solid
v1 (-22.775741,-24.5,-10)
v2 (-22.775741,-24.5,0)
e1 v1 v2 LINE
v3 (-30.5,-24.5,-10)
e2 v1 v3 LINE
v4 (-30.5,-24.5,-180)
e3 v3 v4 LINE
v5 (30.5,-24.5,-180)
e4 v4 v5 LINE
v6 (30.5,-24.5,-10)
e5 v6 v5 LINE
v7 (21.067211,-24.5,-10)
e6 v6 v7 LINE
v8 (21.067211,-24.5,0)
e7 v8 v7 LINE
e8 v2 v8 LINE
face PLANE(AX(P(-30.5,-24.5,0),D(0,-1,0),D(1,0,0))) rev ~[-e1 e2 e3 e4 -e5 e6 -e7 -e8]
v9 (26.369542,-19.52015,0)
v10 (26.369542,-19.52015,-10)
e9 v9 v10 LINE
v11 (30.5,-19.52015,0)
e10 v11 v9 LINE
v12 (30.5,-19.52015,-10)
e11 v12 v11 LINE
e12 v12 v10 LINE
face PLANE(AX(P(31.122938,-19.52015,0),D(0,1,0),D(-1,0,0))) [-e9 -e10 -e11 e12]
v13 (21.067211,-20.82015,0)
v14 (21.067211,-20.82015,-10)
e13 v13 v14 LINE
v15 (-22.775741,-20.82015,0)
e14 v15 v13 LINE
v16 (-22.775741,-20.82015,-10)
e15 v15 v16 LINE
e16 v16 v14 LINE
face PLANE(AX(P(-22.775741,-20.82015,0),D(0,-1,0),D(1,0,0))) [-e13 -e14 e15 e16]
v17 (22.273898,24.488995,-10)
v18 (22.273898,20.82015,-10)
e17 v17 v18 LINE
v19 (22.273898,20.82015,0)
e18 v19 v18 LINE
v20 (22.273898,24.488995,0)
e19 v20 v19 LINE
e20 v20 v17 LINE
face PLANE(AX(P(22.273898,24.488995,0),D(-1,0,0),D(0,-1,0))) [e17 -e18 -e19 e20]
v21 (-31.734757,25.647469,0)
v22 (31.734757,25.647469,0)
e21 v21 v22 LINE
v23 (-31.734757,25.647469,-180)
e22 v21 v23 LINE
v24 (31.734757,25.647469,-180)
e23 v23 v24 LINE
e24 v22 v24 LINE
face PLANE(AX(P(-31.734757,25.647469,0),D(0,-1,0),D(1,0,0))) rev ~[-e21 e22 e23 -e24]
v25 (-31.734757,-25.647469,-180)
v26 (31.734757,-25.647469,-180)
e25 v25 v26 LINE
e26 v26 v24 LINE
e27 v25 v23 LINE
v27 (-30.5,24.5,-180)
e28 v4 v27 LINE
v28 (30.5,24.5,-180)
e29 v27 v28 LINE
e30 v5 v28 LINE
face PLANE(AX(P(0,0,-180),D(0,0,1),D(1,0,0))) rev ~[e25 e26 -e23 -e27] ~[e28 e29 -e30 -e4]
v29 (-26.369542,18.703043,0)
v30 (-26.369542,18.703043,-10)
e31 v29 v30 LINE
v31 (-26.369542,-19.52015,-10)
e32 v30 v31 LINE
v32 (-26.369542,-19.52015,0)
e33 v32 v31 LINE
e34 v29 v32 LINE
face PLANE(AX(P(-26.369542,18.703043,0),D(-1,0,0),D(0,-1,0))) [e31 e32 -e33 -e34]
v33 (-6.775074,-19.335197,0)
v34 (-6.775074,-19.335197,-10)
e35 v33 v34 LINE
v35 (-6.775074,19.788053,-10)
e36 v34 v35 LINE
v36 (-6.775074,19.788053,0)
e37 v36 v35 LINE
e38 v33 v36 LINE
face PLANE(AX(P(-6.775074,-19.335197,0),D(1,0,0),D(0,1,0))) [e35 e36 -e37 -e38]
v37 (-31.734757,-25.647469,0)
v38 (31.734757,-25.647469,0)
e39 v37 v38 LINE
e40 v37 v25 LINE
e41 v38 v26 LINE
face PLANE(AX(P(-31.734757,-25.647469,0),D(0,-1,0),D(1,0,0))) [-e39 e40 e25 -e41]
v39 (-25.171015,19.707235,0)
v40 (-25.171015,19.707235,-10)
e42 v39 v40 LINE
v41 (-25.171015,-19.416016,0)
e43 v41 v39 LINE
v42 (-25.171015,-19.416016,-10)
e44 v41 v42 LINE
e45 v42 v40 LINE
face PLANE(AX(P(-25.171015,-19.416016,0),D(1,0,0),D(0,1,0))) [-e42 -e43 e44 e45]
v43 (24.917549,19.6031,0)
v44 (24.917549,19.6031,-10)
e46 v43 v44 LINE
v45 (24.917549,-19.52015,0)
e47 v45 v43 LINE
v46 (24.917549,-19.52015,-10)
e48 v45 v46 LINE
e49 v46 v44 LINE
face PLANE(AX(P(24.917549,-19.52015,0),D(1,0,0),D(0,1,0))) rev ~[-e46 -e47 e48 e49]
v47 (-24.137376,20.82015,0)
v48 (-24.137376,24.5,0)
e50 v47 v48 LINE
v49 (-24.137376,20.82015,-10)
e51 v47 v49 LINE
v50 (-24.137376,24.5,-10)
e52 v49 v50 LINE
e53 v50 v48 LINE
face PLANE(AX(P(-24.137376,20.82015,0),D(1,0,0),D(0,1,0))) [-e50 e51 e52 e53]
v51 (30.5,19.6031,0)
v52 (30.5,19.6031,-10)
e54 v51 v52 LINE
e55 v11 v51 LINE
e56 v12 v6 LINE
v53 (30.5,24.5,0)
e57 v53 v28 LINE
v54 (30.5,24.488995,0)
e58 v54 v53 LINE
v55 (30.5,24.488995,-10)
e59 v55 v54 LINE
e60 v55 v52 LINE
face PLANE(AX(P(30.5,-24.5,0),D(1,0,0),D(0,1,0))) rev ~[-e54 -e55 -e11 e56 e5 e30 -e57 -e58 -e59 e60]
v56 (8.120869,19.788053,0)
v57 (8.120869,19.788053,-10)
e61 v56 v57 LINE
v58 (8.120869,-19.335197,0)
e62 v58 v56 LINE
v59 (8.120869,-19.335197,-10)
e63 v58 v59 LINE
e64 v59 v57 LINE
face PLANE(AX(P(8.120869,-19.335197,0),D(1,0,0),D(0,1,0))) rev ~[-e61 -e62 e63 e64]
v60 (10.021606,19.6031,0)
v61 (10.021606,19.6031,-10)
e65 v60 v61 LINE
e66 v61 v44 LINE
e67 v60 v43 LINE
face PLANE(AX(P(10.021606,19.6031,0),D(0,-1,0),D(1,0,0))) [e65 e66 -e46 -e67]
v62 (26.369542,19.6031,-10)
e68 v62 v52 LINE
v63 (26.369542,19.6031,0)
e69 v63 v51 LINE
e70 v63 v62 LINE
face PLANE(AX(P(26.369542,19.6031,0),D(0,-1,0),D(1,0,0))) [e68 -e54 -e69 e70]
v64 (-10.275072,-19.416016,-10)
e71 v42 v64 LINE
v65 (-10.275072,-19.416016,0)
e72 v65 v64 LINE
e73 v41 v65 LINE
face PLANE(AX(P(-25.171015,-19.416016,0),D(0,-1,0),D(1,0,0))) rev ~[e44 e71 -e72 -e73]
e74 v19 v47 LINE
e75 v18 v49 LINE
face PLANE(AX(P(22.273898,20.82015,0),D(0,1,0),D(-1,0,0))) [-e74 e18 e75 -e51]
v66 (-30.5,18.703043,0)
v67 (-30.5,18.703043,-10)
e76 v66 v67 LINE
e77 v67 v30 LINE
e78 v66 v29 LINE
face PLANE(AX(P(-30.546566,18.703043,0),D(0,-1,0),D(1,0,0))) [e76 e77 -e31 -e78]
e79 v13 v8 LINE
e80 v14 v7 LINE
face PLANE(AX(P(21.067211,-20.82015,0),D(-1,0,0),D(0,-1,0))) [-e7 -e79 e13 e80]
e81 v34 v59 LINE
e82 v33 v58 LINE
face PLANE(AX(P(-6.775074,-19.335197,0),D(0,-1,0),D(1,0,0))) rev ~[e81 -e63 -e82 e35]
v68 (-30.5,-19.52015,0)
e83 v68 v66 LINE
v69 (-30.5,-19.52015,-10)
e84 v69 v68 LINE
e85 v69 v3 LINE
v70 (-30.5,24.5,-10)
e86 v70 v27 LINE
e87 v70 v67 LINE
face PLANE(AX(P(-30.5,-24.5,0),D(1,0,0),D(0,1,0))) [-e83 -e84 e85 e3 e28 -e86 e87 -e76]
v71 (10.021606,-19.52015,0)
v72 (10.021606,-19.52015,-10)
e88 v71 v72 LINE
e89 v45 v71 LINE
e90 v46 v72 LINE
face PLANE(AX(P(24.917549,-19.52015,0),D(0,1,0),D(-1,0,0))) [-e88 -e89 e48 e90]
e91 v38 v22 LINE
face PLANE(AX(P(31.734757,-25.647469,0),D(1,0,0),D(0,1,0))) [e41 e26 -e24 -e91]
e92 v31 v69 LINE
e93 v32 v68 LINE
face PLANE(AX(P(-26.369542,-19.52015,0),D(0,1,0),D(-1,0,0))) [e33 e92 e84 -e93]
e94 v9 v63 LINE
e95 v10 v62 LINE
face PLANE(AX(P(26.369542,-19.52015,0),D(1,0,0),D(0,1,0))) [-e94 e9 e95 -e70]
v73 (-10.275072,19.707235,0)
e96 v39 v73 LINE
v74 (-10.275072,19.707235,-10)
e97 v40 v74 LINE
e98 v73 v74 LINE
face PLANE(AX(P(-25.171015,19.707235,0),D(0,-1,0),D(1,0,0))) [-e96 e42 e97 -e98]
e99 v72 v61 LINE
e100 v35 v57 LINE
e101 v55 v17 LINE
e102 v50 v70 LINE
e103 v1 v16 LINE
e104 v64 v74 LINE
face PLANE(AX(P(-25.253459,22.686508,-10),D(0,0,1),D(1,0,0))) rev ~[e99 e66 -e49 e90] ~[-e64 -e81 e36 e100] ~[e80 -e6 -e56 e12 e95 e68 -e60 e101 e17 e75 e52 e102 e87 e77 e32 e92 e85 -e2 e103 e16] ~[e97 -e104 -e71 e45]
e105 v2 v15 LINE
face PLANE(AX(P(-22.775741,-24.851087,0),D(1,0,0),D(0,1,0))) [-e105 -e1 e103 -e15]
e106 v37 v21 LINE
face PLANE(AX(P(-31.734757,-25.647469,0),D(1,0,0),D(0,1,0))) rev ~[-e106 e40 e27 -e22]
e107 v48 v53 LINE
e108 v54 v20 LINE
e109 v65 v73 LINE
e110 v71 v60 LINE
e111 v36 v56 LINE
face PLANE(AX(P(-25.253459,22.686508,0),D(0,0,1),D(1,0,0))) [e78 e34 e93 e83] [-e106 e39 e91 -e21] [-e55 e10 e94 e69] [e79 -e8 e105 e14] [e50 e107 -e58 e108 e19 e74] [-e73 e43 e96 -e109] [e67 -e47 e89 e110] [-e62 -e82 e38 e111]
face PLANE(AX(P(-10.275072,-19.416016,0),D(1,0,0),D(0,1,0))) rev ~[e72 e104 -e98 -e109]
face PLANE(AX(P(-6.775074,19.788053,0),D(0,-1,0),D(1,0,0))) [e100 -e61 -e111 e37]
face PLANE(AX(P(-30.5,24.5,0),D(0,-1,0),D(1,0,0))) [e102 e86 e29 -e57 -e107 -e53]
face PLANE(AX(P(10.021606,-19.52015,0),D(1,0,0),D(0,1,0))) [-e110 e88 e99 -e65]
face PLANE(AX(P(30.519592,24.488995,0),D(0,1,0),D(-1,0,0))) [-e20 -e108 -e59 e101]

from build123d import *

# Parameters (mm, degrees)
F0_W     = 63.4695142508
F0_H     = 51.2949377298
F0_W_2   = 61
F0_H_2   = 49
F1_DEPTH = 180
F3_W     = 2.2321660072
F3_H     = 3.732714802
F3_W_2   = 14.8959429935
F3_H_2   = 39.1232501715
F3_W_3   = 3.5938005894
F3_H_3   = 1.2999996543
F3_W_4   = 1.4519924298
F4_DEPTH = 10


# Not quite as in the source:
# - a feature names something its author has since deleted; it is built from what else it names
# - the program builds the solid bodies; features that only make, move or delete a surface that nothing else refers to are left out


with BuildPart() as f1:
    # F0 (on Top) → F1 (new body)
    with BuildSketch(Plane.XY):
        Rectangle(F0_W, F0_H)
        Rectangle(F0_W_2, F0_H_2, mode=Mode.SUBTRACT)
    extrude(amount=-F1_DEPTH)

    # F3 (on Top) → F4 (join)
    with BuildSketch(Plane.XY):
        with Locations((-25.2534588799, 22.6865075529)):
            Rectangle(F3_W, F3_H)
        Polygon((-24.1373758763, 20.8201501518), (-26.3695418835, 20.8201501518), (-26.3695418835, 18.7030434608), (-26.3695418835, -19.5201504976), (-22.775741294, -19.5201504976), (-22.775741294, -20.8201501518), (21.0672114044, -20.8201501518), (21.0672114044, -19.5201504976), (10.0216064602, -19.5201504976), (10.0216064602, 19.603099674), (22.2738981247, 19.603099674), (22.2738981247, 20.8201501518), align=None)
        with Locations((-17.7230439149, 0.1456094906)):
            Rectangle(F3_W_2, F3_H_2, mode=Mode.SUBTRACT)
        with Locations((0.6728977896, 0.226427801)):
            Rectangle(F3_W_2, F3_H_2, mode=Mode.SUBTRACT)
        Polygon((-26.3695418835, 18.7030434608), (-26.3695418835, 20.8201501518), (-26.3695418835, 24.5528649539), (-30.5465664715, 24.5528649539), (-30.5465664715, 18.7030434608), align=None)
        Polygon((22.2738981247, 24.4889948517), (22.2738981247, 20.8201501518), (26.3695418835, 20.8201501518), (26.3695418835, 19.603099674), (30.5195916444, 19.603099674), (30.5195916444, 24.4889948517), align=None)
        Polygon((26.3695418835, 20.8201501518), (22.2738981247, 20.8201501518), (22.2738981247, 19.603099674), (24.9175494537, 19.603099674), (26.3695418835, 19.603099674), align=None)
        with Locations((-24.5726415887, -20.1701503247)):
            Rectangle(F3_W_3, F3_H_3)
        Polygon((-26.3695418835, -20.8201501518), (-26.3695418835, -19.5201504976), (-30.8873578906, -19.5201504976), (-30.8873578906, -24.8510874808), (-22.775741294, -24.8510874808), (-22.775741294, -20.8201501518), align=None)
        with Locations((25.6435456686, 0.0414745882)):
            Rectangle(F3_W_4, F3_H_2)
        Polygon((31.1229377985, -19.5201504976), (26.3695418835, -19.5201504976), (26.3695418835, -20.8201501518), (21.0672114044, -20.8201501518), (21.0672114044, -24.8510874808), (31.1229377985, -24.8510874808), align=None)
        Polygon((26.3695418835, -20.8201501518), (26.3695418835, -19.5201504976), (24.9175494537, -19.5201504976), (21.0672114044, -19.5201504976), (21.0672114044, -20.8201501518), align=None)
    extrude(amount=-F4_DEPTH)


solid = f1.part
